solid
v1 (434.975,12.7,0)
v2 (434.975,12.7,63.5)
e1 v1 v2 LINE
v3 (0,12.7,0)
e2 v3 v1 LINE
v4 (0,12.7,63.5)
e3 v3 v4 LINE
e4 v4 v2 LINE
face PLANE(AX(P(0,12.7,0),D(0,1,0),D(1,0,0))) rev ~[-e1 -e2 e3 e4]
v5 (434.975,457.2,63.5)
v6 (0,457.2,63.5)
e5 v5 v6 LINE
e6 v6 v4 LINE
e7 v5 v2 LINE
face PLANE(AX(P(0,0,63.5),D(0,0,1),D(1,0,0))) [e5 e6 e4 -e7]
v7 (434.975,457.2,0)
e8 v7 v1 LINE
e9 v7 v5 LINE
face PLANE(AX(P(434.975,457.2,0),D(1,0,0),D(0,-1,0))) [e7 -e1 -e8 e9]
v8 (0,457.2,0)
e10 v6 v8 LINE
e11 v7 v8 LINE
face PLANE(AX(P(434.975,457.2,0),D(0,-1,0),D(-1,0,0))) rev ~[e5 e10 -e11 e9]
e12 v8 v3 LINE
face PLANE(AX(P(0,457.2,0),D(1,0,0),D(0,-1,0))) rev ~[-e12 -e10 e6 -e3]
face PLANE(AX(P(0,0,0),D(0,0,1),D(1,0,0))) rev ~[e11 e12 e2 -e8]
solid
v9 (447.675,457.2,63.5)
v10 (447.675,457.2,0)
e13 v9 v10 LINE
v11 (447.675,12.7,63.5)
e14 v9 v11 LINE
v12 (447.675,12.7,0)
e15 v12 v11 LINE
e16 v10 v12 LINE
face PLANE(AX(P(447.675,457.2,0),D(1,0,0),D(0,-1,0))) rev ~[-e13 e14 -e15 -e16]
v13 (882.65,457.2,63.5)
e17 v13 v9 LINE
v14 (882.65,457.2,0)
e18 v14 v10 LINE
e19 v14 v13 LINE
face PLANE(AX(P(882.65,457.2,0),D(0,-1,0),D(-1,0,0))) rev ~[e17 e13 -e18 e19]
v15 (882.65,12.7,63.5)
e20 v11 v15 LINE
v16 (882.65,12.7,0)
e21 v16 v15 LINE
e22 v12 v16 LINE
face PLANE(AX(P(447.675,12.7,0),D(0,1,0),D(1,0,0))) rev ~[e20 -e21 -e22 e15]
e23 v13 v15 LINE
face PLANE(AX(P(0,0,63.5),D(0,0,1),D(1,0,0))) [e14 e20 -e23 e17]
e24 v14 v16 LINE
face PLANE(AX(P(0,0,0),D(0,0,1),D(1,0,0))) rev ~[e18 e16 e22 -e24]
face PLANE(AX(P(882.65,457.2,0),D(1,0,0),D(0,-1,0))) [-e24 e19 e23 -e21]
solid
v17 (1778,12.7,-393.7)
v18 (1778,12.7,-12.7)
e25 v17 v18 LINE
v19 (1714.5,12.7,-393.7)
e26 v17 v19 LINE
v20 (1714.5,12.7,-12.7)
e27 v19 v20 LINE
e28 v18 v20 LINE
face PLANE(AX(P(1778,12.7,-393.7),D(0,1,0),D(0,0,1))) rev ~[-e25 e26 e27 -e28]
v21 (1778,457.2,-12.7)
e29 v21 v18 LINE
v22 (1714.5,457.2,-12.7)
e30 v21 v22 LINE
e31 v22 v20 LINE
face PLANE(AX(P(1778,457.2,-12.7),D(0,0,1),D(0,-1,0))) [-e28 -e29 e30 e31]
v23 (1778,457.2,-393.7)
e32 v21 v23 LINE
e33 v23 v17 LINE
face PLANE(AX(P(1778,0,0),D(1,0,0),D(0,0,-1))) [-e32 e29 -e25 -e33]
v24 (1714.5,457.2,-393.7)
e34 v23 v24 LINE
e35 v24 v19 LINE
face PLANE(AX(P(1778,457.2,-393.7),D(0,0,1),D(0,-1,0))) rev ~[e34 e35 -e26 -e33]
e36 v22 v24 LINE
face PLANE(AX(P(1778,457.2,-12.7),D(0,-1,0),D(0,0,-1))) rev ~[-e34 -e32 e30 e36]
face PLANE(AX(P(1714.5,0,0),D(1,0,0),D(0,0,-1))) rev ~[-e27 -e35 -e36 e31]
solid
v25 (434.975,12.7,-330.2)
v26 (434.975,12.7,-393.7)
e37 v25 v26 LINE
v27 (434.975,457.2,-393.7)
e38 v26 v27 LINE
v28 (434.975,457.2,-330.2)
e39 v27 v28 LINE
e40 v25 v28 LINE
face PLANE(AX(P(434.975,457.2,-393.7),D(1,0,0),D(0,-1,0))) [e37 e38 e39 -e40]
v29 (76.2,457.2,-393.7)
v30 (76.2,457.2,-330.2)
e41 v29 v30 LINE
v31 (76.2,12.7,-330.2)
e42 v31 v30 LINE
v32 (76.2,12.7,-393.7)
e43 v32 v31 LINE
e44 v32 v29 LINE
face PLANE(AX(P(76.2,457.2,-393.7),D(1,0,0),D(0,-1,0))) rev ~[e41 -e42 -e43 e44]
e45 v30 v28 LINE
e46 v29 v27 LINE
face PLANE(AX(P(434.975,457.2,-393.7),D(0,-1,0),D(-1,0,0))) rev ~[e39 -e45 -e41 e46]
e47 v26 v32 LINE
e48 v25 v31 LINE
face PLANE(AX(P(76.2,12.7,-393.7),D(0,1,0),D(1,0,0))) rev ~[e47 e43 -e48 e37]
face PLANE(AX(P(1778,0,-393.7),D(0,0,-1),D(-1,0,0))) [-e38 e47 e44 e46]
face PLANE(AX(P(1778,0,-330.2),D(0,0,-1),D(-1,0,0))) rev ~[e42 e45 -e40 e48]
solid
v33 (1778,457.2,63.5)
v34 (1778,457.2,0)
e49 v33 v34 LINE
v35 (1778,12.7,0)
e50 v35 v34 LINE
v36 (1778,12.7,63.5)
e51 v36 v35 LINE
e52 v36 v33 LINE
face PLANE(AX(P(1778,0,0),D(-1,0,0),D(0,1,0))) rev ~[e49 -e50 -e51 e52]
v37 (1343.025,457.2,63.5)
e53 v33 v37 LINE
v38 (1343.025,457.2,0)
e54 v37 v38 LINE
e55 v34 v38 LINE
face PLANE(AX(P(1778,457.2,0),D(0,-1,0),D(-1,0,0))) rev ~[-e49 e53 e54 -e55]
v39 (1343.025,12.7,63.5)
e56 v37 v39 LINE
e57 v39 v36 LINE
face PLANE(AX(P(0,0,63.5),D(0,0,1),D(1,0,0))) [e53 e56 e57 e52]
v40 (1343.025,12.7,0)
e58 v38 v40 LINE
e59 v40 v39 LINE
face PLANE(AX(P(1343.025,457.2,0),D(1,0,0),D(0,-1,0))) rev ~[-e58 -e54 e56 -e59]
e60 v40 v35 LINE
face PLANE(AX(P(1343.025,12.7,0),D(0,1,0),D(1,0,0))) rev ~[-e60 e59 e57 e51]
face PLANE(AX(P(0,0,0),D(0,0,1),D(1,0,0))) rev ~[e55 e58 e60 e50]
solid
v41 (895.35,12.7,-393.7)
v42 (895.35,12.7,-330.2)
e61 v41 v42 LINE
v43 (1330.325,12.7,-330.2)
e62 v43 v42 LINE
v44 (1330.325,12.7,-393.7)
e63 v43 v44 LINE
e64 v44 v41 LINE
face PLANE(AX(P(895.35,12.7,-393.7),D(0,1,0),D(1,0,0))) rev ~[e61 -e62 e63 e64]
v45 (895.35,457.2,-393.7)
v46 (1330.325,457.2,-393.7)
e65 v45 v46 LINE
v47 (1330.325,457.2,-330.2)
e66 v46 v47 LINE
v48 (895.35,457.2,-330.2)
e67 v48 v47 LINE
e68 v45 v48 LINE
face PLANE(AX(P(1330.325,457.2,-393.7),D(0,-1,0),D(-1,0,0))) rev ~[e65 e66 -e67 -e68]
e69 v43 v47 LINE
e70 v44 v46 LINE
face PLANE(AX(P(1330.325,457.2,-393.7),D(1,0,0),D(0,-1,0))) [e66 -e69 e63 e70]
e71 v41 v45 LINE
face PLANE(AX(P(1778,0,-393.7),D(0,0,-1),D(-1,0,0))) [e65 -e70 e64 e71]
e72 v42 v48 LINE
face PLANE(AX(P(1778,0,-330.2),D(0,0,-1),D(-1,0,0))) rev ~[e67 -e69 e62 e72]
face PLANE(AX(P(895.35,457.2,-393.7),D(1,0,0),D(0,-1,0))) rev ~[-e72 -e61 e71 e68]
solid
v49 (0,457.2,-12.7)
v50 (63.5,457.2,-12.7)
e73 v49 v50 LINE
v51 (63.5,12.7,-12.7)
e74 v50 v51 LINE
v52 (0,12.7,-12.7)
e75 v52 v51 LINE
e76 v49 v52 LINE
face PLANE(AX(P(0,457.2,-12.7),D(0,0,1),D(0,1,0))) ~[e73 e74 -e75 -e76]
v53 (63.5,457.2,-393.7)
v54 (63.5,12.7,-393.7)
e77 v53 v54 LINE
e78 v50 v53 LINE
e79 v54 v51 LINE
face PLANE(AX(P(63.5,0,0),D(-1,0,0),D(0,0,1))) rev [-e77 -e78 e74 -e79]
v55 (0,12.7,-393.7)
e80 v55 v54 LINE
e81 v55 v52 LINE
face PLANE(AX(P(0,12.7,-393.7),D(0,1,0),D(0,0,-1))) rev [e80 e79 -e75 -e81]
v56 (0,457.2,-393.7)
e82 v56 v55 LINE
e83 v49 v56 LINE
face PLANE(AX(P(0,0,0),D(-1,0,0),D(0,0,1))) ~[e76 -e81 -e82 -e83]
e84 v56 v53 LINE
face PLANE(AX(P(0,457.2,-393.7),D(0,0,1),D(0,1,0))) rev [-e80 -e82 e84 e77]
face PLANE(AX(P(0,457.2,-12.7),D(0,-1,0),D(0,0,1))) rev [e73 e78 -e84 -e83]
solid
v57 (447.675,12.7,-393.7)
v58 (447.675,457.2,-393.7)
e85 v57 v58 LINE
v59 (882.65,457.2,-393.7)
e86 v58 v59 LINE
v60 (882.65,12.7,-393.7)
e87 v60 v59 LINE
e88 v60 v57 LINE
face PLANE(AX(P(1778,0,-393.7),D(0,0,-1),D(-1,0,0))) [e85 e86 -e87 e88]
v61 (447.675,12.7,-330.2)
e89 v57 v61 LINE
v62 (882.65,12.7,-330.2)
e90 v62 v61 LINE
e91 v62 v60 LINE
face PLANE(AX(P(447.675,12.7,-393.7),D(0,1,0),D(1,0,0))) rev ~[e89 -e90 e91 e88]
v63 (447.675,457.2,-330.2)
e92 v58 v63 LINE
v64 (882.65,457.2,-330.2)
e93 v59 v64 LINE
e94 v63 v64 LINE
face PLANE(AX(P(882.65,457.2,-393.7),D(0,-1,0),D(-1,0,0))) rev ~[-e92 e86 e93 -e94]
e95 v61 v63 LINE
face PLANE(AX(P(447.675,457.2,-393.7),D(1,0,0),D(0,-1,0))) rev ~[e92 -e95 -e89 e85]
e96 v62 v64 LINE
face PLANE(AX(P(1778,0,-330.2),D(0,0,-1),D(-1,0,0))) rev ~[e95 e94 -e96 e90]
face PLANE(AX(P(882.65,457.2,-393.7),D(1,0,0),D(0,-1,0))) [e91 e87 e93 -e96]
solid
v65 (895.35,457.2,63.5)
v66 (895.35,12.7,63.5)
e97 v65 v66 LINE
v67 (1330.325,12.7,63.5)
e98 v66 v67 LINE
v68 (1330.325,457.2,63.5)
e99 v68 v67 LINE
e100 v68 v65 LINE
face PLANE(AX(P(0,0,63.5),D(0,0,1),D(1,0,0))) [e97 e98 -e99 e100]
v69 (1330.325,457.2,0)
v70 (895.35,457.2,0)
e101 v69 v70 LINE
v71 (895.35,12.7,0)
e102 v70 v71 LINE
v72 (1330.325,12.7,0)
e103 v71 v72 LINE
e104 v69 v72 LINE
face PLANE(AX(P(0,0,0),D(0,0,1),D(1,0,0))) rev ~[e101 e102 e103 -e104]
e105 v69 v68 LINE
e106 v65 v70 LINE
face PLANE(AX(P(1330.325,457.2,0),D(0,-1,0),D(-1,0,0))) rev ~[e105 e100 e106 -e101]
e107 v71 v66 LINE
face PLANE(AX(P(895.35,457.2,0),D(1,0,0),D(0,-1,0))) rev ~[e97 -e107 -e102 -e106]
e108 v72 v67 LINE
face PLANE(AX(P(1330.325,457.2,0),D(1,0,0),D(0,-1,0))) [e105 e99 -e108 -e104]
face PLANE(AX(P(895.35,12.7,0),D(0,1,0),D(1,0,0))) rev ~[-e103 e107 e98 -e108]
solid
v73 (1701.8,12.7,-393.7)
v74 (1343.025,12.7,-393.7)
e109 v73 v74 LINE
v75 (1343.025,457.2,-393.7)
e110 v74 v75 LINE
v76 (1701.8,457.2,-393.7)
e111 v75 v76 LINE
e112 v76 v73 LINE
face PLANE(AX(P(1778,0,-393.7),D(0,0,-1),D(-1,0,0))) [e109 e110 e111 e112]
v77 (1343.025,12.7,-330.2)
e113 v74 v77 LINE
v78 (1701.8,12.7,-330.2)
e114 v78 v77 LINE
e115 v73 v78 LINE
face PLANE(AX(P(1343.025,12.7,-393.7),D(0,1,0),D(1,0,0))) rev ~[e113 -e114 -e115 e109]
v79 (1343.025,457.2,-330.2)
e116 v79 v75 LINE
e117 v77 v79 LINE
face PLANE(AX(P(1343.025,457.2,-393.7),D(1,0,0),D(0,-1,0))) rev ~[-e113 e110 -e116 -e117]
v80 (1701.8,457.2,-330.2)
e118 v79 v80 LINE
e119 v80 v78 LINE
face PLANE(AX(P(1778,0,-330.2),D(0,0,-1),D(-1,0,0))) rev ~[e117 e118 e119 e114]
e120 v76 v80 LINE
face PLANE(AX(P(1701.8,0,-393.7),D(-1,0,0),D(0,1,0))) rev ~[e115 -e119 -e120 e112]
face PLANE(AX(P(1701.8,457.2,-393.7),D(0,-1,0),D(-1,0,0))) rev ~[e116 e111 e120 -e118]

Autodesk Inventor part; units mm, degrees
ref_plane "YZ Plane" through (0, 0, 0) normal (1, 0, 0) x (0, 1, 0)
ref_plane "XZ Plane" through (0, 0, 0) normal (0, 1, 0) x (-1, 0, 0)
sketch "Sketch1" plane through (0, 0, 0) normal (0, 0, 1) x (1, 0, 0)
  line L0 (0, 0) -> (1778, 0)
  line L1 (1778, 0) -> (1778, 457.2)
  line L2 (1778, 457.2) -> (0, 457.2)
  line L3 (0, 457.2) -> (0, 0)
  line L4 (434.975, 457.2) -> (434.975, 0)
  line L5 (447.675, 457.2) -> (447.675, 0)
  line L6 (882.65, 457.2) -> (882.65, 0)
  line L7 (895.35, 457.2) -> (895.35, 0)
  line L8 (1330.325, 457.2) -> (1330.325, 0)
  line L9 (1343.025, 457.2) -> (1343.025, 0)
  dimension "d0" = 1778
  dimension "d1" = 457.2
  dimension "d2" = 434.975
  dimension "d3" = 12.7
  dimension "d4" = 434.975
  dimension "d5" = 12.7
  dimension "d6" = 434.975
  dimension "d7" = 12.7
  dimension "d8" = 434.975
extrude "Extrusion1" add sketch "Sketch1" along normal blind 63.5 contours L3 L2 L4 L0
extrude "Extrusion2" add sketch "Sketch1" along normal blind 63.5 separate body contours L5 L2 L6 L0
extrude "Extrusion3" add sketch "Sketch1" along normal blind 63.5 separate body contours L7 L2 L8 L0
extrude "Extrusion4" add sketch "Sketch1" along normal blind 63.5 separate body contours L9 L2 L1 L0
sketch "Sketch2" plane through (1778, 0, 0) normal (1, 0, 0) x (0, 0, -1)
  line L0 (0, 0) -> (0, 457.2) projected
  line L1 (12.7, 457.2) -> (12.7, 0)
  line L2 (0, 457.2) -> (-63.5, 457.2) projected
  line L3 (393.7, 457.2) -> (393.7, 0)
  line L4 (393.7, 0) -> (12.7, 0)
  line L5 (-63.5, 457.2) -> (0, 457.2)
  line L6 (12.7, 457.2) -> (393.7, 457.2)
  line L7 (0, 457.2) -> (-63.5, 457.2) projected
  dimension "d17" = 12.7
  dimension "d19" = 381
  dimension "d20" = 457.2
extrude "Extrusion5" add sketch "Sketch2" against normal blind 63.5 separate body
ref_plane "Work Plane1" through (889, 0, 0) normal (1, 0, 0) x (0, 0, -1)
mirror "Mirror1" about plane through (889, 0, 0) normal (1, 0, 0) bodies 5
sketch "Sketch3" plane through (1778, 0, -393.7) normal (0, 0, -1) x (-1, 0, 0)
  line L0 (63.5, 457.2) -> (63.5, 0) projected
  line L1 (1714.5, 457.2) -> (1714.5, 0) projected
  line L2 (434.975, 457.2) -> (434.975, 0) projected
  line L3 (447.675, 457.2) -> (447.675, 0) projected
  line L4 (882.65, 457.2) -> (882.65, 0) projected
  line L5 (895.35, 457.2) -> (895.35, 0) projected
  line L6 (1330.325, 457.2) -> (1330.325, 0) projected
  line L7 (1343.025, 457.2) -> (1343.025, 0) projected
  line L8 (0, 457.2) -> (434.975, 457.2) projected
  line L9 (76.2, 457.2) -> (434.975, 457.2)
  line L10 (434.975, 457.2) -> (434.975, 0)
  line L11 (434.975, 0) -> (76.2, 0)
  line L12 (76.2, 0) -> (76.2, 457.2)
  line L13 (447.675, 457.2) -> (882.65, 457.2) projected
  line L14 (447.675, 457.2) -> (882.65, 457.2)
  line L15 (882.65, 457.2) -> (882.65, 0)
  line L16 (882.65, 0) -> (447.675, 0)
  line L17 (447.675, 0) -> (447.675, 457.2)
  line L18 (895.35, 457.2) -> (1330.325, 457.2) projected
  line L19 (1330.325, 0) -> (895.35, 0) projected
  line L20 (895.35, 457.2) -> (1330.325, 457.2)
  line L21 (1330.325, 457.2) -> (1330.325, 0)
  line L22 (1330.325, 0) -> (895.35, 0)
  line L23 (895.35, 0) -> (895.35, 457.2)
  line L24 (1343.025, 457.2) -> (1701.8, 457.2)
  line L25 (1701.8, 457.2) -> (1701.8, 0)
  line L26 (1701.8, 0) -> (1343.025, 0)
  line L27 (1343.025, 0) -> (1343.025, 457.2)
  point P0 (1778, 0)
  dimension "d23" = 12.7
  dimension "d24" = 12.7
extrude "Extrusion6" add sketch "Sketch3" against normal blind 63.5 separate body contours L2 L11 L12 L8
extrude "Extrusion7" add sketch "Sketch3" against normal blind 63.5 separate body contours L13 L4 L16 L3
extrude "Extrusion8" add sketch "Sketch3" against normal blind 63.5 separate body contours L18 L6 L19 L5
extrude "Extrusion9" add sketch "Sketch3" against normal blind 63.5 separate body contours L24 L25 L26 L7
move faces "Move1" translate (0, 12.7, 0) faces at (1756.8333, 0, -139.7)
move faces "Move2" translate (0, 12.7, 0) faces at (1582.2083, 0, -351.3667)
move faces "Move3" translate (0, 12.7, 0) faces at (1185.3333, 0, -372.5333)
move faces "Move4" translate (0, 12.7, 0) faces at (737.6583, 0, -372.5333)
move faces "Move5" translate (0, 12.7, 0) faces at (315.3833, 0, -372.5333)
move faces "Move6" translate (0, 12.7, 0) faces at (21.1667, 0, -139.7)
move faces "Move7" translate (0, 12.7, 0) faces at (144.9917, 0, 21.1667)
move faces "Move8" translate (0, 12.7, 0) faces at (592.6667, 0, 21.1667)
move faces "Move9" translate (0, 12.7, 0) faces at (1040.3417, 0, 42.3333)
move faces "Move10" translate (0, 12.7, 0) faces at (1488.0167, 0, 21.1667)
properties part number "Standard - Amber select" material "Granite, Cut, Polished"
